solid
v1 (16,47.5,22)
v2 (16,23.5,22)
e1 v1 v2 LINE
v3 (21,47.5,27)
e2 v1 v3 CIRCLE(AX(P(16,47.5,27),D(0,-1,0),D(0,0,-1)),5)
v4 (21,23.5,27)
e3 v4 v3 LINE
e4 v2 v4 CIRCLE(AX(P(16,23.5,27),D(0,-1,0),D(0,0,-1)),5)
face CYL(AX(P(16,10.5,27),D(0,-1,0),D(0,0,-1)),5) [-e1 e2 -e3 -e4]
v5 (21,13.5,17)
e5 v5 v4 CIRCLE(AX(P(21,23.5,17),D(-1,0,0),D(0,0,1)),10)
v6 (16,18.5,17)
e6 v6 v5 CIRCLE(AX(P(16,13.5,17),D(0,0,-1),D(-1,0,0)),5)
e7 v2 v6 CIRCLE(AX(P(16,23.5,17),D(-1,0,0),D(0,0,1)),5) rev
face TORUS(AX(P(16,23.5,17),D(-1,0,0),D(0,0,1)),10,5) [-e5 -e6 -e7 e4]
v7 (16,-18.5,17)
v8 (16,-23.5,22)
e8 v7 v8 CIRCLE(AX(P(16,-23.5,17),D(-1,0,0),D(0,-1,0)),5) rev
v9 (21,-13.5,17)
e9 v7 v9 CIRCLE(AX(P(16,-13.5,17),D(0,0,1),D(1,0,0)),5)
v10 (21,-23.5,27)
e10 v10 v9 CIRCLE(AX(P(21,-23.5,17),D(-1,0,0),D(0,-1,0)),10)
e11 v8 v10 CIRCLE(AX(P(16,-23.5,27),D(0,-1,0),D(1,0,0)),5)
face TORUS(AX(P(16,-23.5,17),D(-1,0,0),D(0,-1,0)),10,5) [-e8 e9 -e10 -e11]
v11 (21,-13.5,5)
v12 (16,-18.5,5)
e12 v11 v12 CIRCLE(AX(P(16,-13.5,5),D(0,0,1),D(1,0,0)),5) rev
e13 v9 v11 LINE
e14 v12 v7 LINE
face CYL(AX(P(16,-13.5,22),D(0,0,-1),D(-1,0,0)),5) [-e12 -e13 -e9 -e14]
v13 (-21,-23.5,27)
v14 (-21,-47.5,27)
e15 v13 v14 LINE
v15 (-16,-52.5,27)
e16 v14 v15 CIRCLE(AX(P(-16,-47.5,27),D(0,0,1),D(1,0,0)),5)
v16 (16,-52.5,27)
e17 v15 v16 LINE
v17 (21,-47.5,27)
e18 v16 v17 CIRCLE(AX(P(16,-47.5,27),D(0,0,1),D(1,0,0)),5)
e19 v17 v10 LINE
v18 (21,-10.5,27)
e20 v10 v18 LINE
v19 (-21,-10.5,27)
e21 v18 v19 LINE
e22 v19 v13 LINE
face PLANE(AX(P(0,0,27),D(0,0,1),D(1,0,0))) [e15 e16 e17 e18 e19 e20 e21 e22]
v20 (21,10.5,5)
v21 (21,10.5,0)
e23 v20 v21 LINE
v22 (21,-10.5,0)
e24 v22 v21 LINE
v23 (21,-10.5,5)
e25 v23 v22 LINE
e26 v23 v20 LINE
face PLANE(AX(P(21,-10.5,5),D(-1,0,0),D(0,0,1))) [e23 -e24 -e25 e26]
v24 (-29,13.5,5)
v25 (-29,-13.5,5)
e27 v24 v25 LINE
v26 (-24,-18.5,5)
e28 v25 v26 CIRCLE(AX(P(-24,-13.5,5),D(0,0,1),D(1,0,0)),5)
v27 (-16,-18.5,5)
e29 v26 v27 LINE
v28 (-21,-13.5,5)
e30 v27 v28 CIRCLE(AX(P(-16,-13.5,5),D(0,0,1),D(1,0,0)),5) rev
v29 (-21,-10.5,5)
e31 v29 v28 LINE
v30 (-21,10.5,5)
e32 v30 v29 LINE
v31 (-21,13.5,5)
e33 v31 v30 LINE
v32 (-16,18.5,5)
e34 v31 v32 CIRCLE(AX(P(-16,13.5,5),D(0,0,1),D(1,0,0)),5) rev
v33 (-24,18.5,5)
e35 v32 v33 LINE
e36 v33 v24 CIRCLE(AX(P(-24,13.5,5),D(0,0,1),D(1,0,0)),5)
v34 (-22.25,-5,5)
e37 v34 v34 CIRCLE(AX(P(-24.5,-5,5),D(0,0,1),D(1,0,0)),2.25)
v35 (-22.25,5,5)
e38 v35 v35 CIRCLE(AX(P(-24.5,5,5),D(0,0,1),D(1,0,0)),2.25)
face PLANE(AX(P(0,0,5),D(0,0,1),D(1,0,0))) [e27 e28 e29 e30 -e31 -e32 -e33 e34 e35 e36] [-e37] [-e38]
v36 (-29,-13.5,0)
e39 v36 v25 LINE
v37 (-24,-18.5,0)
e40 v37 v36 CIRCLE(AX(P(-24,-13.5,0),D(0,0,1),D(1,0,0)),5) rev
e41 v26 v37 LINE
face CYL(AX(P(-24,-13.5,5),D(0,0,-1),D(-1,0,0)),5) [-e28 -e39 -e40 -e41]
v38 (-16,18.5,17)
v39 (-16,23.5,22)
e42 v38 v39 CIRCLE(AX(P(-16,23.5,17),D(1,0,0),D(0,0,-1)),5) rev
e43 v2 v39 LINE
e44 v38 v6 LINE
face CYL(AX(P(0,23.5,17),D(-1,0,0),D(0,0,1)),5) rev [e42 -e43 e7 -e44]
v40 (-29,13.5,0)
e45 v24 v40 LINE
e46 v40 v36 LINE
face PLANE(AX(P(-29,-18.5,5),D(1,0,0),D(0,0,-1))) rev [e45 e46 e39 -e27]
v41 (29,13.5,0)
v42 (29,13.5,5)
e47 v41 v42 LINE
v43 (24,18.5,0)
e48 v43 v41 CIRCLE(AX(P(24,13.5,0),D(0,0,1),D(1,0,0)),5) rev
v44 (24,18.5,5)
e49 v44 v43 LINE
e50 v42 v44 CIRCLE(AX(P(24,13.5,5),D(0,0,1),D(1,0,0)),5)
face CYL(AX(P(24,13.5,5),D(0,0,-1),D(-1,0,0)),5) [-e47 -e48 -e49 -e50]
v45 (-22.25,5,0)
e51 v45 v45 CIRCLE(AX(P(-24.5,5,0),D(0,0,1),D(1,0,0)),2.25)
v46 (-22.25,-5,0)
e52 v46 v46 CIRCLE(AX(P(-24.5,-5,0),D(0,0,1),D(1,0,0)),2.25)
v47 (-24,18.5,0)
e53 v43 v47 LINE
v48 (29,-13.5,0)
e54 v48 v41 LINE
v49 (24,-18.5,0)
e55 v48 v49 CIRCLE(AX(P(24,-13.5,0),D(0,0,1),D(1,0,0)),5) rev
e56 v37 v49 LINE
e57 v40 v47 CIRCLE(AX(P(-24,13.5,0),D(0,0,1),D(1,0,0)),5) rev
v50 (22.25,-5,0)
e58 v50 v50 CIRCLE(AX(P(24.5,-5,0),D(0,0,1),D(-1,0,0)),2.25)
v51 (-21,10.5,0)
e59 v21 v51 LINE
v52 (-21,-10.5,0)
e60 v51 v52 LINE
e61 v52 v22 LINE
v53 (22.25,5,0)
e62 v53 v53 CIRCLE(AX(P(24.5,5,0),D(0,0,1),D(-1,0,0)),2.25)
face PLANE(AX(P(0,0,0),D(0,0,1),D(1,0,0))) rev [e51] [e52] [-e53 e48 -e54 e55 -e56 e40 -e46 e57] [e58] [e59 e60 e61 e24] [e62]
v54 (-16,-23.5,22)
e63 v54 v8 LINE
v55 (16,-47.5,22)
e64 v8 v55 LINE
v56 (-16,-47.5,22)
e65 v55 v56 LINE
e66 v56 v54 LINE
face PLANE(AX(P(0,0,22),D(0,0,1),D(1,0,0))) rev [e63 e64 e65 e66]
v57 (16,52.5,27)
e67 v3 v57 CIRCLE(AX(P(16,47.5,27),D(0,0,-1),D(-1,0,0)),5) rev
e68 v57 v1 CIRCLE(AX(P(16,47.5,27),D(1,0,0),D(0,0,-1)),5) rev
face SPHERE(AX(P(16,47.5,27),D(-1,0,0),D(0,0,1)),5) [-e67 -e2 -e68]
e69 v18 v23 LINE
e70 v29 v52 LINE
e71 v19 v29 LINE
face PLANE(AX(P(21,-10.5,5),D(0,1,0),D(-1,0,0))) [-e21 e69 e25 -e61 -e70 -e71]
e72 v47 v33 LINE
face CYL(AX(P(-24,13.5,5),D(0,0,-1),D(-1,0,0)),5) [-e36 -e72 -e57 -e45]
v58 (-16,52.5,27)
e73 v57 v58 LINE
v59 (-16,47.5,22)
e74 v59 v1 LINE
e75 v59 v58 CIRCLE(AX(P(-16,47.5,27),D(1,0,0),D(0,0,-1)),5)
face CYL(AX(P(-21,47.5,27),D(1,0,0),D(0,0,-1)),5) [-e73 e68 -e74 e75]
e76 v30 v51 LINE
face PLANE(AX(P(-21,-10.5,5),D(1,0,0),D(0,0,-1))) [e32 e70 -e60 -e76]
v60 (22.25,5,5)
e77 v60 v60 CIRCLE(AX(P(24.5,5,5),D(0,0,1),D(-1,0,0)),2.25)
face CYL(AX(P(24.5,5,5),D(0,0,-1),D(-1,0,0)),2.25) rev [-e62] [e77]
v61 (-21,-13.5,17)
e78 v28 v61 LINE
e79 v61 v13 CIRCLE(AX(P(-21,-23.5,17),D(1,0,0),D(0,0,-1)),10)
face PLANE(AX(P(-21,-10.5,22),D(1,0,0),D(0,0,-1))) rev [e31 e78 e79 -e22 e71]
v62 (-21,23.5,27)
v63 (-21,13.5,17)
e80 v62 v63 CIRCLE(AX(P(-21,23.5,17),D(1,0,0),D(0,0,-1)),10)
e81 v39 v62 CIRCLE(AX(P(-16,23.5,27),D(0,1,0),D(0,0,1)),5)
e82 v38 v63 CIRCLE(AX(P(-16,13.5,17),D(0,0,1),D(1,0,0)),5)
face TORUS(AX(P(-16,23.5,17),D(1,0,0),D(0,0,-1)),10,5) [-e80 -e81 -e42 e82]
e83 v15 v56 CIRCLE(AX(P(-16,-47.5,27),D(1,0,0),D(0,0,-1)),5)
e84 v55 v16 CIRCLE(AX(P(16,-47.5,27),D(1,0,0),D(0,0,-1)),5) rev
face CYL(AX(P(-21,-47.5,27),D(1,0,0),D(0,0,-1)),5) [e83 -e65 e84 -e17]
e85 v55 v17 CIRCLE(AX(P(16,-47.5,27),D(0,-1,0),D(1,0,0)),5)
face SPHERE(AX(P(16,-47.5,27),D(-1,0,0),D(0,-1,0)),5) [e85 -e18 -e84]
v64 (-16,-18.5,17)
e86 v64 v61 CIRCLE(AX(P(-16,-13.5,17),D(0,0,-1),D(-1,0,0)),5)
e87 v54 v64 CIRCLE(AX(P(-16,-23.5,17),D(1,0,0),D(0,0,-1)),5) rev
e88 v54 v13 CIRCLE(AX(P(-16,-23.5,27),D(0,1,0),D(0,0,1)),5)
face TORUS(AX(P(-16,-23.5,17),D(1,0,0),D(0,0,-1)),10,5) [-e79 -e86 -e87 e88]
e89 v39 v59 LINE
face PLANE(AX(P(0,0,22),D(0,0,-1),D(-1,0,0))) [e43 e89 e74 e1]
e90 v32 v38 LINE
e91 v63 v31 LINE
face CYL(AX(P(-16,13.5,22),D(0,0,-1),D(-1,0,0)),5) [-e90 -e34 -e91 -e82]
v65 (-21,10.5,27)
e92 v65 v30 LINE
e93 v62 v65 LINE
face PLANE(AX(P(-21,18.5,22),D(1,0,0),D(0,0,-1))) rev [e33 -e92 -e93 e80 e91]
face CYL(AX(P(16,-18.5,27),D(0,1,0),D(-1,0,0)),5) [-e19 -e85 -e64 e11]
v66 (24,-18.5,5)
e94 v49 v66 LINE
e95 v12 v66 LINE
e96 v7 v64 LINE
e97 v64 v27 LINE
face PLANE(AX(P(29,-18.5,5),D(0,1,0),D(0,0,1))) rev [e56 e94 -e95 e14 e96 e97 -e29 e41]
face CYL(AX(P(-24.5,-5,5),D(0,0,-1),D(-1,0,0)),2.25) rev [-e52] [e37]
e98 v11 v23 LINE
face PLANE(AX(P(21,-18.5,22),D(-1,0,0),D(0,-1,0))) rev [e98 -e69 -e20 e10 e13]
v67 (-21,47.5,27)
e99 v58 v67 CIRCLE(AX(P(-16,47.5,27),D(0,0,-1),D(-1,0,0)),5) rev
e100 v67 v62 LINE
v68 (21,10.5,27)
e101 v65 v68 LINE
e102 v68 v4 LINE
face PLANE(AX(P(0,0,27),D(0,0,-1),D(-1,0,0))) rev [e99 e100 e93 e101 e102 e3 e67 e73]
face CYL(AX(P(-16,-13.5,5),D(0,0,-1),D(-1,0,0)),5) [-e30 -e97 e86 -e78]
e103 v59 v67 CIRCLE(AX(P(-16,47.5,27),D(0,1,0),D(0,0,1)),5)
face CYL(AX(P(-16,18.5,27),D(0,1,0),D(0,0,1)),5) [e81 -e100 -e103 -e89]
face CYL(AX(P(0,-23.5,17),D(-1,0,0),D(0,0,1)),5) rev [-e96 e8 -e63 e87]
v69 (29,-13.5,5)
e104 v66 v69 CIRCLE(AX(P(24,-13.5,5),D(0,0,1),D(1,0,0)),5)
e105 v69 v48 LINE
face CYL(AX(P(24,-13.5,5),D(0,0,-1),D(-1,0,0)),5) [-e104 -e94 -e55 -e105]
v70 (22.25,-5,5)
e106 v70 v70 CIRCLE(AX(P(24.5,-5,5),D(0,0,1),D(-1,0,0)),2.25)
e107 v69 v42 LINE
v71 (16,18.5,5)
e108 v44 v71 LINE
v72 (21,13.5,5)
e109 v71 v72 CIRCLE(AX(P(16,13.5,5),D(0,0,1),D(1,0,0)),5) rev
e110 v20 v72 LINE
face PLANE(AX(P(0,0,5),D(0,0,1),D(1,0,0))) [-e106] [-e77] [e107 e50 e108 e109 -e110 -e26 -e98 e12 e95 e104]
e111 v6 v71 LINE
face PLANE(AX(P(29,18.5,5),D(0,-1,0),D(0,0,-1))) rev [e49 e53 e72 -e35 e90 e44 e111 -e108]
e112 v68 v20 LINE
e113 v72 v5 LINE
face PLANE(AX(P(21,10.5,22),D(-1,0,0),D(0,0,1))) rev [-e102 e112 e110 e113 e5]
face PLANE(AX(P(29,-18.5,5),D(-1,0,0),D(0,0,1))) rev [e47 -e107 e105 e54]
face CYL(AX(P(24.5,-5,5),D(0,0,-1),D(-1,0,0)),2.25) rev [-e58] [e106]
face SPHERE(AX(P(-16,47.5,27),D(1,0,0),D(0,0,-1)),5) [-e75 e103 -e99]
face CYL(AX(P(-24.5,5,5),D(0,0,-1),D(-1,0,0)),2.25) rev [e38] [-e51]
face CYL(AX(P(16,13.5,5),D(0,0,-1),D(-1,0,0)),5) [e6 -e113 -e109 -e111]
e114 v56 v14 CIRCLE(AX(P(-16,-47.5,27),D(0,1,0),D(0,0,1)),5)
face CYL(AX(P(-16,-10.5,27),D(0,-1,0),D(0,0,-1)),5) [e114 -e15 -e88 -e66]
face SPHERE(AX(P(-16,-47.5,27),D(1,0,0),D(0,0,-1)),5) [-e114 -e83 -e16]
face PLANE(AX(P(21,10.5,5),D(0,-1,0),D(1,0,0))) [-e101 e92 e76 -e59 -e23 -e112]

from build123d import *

# Parameters (mm, degrees)
SKETCH1_W           = 58
SKETCH1_H           = 37
SKETCH1_R           = 2.25
SKETCH1_W_2         = 42
SKETCH1_H_2         = 21
BOSS_EXTRUDE1_DEPTH = 5
SKETCH2_W           = 42
SKETCH2_H           = 8
BOSS_EXTRUDE2_DEPTH = 17
SKETCH3_W           = 42
SKETCH3_H           = 42
BOSS_EXTRUDE3_DEPTH = 5
FILLET1_R           = 5
FILLET2_R           = 5
FILLET3_R           = 5
FILLET4_R           = 5
FILLET5_R           = 5
FILLET6_R           = 5
FILLET7_R           = 5


with BuildPart() as part:
    # Sketch1 → Boss-Extrude1 (new body)
    with BuildSketch(Plane.XY):
        Rectangle(SKETCH1_W, SKETCH1_H)
        with Locations((-24.5, 5)):
            Circle(SKETCH1_R, mode=Mode.SUBTRACT)
        with Locations((-24.5, -5)):
            Circle(SKETCH1_R, mode=Mode.SUBTRACT)
        with Locations(Location((24.5, 5, 0), (0, 0, 180))):
            Circle(SKETCH1_R, mode=Mode.SUBTRACT)
        with Locations(Location((24.5, -5, 0), (0, 0, 180))):
            Circle(SKETCH1_R, mode=Mode.SUBTRACT)
        Rectangle(SKETCH1_W_2, SKETCH1_H_2, mode=Mode.SUBTRACT)
    extrude(amount=BOSS_EXTRUDE1_DEPTH)

    # Sketch2 → Boss-Extrude2 (add)
    with BuildSketch(Plane.XY.offset(5)):
        with Locations((0, 14.5)):
            Rectangle(SKETCH2_W, SKETCH2_H)
        with Locations((0, -14.5)):
            Rectangle(SKETCH2_W, SKETCH2_H)
    extrude(amount=BOSS_EXTRUDE2_DEPTH)

    # Sketch3 → Boss-Extrude3 (add)
    with BuildSketch(Plane.XY.offset(22)):
        with Locations((0, -31.5)):
            Rectangle(SKETCH3_W, SKETCH3_H)
        with Locations((0, 31.5)):
            Rectangle(SKETCH3_W, SKETCH3_H)
    extrude(amount=BOSS_EXTRUDE3_DEPTH)

    # Fillet1
    fillet1_edges = [part.edges().sort_by_distance(p)[0] for p in [
        (0, 18.5, 22),
    ]]
    fillet(fillet1_edges, radius=FILLET1_R)

    # Fillet2
    fillet2_edges = [part.edges().sort_by_distance(p)[0] for p in [
        (0, -18.5, 22),
    ]]
    fillet(fillet2_edges, radius=FILLET2_R)

    # Fillet3
    fillet3_edges = [part.edges().sort_by_distance(p)[0] for p in [
        (0, 52.5, 22),
    ]]
    fillet(fillet3_edges, radius=FILLET3_R - 0.0001)  # a hair under: the kernel refuses the full size

    # Fillet4
    fillet4_edges = [part.edges().sort_by_distance(p)[0] for p in [
        (0, -52.5, 22),
    ]]
    fillet(fillet4_edges, radius=FILLET4_R - 0.0001)  # a hair under: the kernel refuses the full size

    # Fillet5
    fillet5_edges = [part.edges().sort_by_distance(p)[0] for p in [
        (-21, 51.035563195, 23.464436805),
        (-21, 18.5, 11),
        (-21, 19.964466094, 20.535533906),
        (21, 18.5, 11),
        (21, 19.964466094, 20.535533906),
        (21, 51.035563195, 23.464436805),
        (-21, 35.50005, 22),
        (21, 35.50005, 22),
    ]]
    fillet(fillet5_edges, radius=FILLET5_R - 0.0001)  # a hair under: the kernel refuses the full size

    # Fillet6
    fillet6_edges = [part.edges().sort_by_distance(p)[0] for p in [
        (-21, -35.50005, 22),
        (21, -18.5, 11),
        (-21, -18.5, 11),
        (21, -19.964466094, 20.535533906),
        (-21, -19.964466094, 20.535533906),
        (21, -35.50005, 22),
        (21, -51.035563195, 23.464436805),
        (-21, -51.035563195, 23.464436805),
    ]]
    fillet(fillet6_edges, radius=FILLET6_R - 0.0001)  # a hair under: the kernel refuses the full size

    # Fillet7
    fillet7_edges = [part.edges().sort_by_distance(p)[0] for p in [
        (-29, 18.5, 2.5),
        (-29, -18.5, 2.5),
        (29, -18.5, 2.5),
        (29, 18.5, 2.5),
    ]]
    fillet(fillet7_edges, radius=FILLET7_R)


solid = part.part
